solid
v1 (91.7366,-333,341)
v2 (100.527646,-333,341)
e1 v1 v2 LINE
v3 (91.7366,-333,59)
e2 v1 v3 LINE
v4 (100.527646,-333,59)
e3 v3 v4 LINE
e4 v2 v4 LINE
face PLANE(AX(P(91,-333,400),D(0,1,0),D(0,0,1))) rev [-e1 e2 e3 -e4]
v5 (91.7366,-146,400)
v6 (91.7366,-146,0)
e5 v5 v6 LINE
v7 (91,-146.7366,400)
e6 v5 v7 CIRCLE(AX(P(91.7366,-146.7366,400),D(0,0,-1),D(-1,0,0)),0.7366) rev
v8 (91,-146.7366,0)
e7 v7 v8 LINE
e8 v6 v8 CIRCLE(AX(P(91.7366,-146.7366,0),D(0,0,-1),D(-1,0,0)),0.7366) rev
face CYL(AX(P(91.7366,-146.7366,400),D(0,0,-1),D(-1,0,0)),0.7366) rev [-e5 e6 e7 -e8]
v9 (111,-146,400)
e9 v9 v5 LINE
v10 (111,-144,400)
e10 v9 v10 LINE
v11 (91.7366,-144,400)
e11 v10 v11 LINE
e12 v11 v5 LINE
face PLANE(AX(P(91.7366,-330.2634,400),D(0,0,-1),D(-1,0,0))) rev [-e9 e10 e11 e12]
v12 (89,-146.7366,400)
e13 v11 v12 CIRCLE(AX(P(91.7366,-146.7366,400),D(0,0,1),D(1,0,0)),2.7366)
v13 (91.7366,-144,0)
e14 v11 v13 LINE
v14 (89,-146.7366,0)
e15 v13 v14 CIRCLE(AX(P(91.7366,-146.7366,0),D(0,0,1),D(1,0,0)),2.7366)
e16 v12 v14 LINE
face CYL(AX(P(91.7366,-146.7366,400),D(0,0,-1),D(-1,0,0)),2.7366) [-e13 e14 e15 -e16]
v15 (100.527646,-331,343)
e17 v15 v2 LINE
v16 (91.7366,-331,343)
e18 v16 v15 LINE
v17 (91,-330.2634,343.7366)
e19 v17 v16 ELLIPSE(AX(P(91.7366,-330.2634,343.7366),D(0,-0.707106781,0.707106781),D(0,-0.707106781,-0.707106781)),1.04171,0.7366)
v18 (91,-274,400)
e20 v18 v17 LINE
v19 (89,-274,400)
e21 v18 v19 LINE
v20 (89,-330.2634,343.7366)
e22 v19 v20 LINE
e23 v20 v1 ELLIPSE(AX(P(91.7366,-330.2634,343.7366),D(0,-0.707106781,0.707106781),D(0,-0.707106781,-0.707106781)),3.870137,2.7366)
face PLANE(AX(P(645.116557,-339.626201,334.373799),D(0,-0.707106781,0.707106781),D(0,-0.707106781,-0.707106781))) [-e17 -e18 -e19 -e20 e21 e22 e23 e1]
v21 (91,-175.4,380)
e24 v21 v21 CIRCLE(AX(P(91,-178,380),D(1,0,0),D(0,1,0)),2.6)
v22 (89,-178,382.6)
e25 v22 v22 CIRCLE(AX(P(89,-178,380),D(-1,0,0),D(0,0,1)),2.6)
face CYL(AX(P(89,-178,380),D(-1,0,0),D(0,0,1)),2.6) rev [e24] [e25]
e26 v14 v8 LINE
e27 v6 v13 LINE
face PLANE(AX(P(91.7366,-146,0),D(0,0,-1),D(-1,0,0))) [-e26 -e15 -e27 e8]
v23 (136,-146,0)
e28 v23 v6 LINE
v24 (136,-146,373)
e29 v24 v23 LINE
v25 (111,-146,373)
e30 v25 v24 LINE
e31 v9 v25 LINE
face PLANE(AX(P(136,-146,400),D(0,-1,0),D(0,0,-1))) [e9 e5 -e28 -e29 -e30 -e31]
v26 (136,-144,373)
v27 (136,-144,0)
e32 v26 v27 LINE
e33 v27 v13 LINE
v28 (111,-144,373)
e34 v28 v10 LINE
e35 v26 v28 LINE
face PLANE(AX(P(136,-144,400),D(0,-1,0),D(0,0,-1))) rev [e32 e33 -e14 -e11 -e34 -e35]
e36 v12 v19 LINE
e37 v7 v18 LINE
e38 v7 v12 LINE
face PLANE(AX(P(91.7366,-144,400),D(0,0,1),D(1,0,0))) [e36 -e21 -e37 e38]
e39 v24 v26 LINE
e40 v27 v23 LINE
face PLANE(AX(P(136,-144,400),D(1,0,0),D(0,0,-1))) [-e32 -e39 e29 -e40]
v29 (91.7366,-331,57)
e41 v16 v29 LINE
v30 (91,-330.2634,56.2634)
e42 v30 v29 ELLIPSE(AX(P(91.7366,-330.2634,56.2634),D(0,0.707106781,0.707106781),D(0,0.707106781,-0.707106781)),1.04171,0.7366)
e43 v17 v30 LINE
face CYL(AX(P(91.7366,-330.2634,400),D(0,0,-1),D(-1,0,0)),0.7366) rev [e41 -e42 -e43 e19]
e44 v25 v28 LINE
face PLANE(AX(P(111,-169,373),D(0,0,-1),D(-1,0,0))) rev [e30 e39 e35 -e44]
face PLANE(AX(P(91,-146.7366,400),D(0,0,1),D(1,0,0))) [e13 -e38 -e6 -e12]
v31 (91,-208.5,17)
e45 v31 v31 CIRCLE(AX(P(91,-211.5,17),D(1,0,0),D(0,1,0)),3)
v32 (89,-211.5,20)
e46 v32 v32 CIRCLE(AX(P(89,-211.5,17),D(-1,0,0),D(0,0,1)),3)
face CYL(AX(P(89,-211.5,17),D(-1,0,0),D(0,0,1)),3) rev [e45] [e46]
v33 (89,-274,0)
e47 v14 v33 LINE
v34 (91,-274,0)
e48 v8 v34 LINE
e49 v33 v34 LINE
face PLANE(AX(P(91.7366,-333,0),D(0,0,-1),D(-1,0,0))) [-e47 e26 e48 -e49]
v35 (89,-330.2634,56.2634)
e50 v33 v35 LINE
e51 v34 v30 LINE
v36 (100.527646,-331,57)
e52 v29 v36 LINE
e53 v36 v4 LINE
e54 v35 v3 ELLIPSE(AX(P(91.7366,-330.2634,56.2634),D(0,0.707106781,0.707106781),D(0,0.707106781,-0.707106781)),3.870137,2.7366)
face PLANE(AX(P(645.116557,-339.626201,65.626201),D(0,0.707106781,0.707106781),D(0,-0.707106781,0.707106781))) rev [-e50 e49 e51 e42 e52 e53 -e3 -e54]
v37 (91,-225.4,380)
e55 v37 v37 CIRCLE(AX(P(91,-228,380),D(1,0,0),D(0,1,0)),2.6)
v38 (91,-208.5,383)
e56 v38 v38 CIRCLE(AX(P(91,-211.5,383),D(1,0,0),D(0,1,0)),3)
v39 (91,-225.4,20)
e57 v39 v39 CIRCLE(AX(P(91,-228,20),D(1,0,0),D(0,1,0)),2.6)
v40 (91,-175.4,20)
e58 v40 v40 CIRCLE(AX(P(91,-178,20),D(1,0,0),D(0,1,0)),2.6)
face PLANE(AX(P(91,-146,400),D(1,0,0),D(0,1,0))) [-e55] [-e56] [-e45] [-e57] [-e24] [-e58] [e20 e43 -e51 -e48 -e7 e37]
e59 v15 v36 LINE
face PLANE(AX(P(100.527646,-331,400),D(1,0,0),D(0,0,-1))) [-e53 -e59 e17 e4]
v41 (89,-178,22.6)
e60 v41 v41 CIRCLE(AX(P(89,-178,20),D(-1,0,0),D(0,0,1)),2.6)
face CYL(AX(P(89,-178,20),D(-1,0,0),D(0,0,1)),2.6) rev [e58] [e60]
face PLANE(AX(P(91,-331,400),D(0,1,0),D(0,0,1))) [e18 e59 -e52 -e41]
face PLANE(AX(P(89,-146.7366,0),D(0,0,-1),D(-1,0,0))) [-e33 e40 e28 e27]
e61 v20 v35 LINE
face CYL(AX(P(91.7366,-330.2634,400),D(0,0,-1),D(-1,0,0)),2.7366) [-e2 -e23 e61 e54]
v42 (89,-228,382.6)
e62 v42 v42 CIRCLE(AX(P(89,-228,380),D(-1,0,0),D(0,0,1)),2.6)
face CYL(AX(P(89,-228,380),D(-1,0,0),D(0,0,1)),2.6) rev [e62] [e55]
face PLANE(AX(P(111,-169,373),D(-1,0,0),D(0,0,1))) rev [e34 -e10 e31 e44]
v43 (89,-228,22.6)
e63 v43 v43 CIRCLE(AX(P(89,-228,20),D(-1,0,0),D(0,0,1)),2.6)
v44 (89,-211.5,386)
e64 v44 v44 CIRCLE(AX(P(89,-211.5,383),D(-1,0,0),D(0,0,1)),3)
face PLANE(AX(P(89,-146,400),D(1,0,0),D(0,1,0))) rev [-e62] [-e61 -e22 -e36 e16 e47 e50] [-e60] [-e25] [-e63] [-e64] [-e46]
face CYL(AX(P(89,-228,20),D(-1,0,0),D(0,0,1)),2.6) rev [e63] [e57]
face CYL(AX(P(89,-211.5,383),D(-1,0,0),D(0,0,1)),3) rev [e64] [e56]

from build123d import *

# Parameters (mm, degrees)
SM_BASE_FLANGE_1_DEPTH           = 400
HOLE_WIZARD_5_2_5_2_1_AT_2_COUNT = 2
HOLE_WIZARD_5_2_5_2_1_AT_2_PITCH = 50
CUT_EXTRUDE_1_DEPTH              = 523.587791668
HOLE_WIZARD_6_0_6_1_D            = 6
HOLE_WIZARD_6_0_6_1_DEPTH        = 220
HOLE_WIZARD_6_0_6_1_TIP          = 1.802581857
SKETCH_11_W                      = 32.021510722
SKETCH_11_H                      = 35
CUT_EXTRUDE_2_DEPTH              = 25


# Sheet-metal steps are written as plain solids
with BuildPart() as part:
    # Sketch 1 → 基体-法兰1 (new body)
    with BuildSketch(Plane.XY):
        with BuildLine():
            Line((136, -146), (91.7366, -146))
            ThreePointArc((91.7366, -146), (91.215745145, -146.215745145), (91, -146.7366))
            Line((91, -146.7366), (91, -330.2634))
            ThreePointArc((91, -330.2634), (91.215745145, -330.784254855), (91.7366, -331))
            Line((91.7366, -331), (100.527645566, -331))
            Line((100.527645566, -331), (100.527645566, -333))
            Line((100.527645566, -333), (91.7366, -333))
            ThreePointArc((91.7366, -333), (89.801531583, -332.198468417), (89, -330.2634))
            Line((89, -330.2634), (89, -146.7366))
            ThreePointArc((89, -146.7366), (89.801531583, -144.801531583), (91.7366, -144))
            Line((91.7366, -144), (136, -144))
            Line((136, -144), (136, -146))
        make_face()
    extrude(amount=SM_BASE_FLANGE_1_DEPTH)

    # 草图6 → Ø5.2 (5.2) 直径孔1 (revolve, cut)
    with BuildSketch(Plane(origin=(89, -178, 380), x_dir=(0, 0, 1), z_dir=(0, 1, 0))):
        Polygon((0, 0), (0, 11.562237609), (2.6, 10), (2.6, 0), align=None)
    hole_wizard_5_2_5_2_1 = revolve(axis=Axis((82.65, -178, 380), (1, 0, 0)), mode=Mode.SUBTRACT)

    # Ø5.2 (5.2) 直径孔1 at 2: Ø5.2 (5.2) 直径孔1 ×2
    with Locations(*[(0, -i * HOLE_WIZARD_5_2_5_2_1_AT_2_PITCH, 0) for i in range(1, HOLE_WIZARD_5_2_5_2_1_AT_2_COUNT)]):
        add(hole_wizard_5_2_5_2_1, mode=Mode.SUBTRACT)

    # 镜向1: Ø5.2 (5.2) 直径孔1 across plane
    add(hole_wizard_5_2_5_2_1.mirror(Plane(origin=(0, 0, 200), x_dir=(1, 0, 0), z_dir=(0, 0, -1))), mode=Mode.SUBTRACT)

    # 镜向1 copy 1 sketch → 镜向1 copy 1 (revolve, cut)
    with BuildSketch(Plane(origin=(89, -228, 20), x_dir=(0, 0, -1), z_dir=(0, 1, 0))):
        Polygon((0, 0), (0, -11.562237609), (2.6, -10), (2.6, 0), align=None)
    revolve(axis=Axis((82.65, -228, 20), (-1, 0, 0)), mode=Mode.SUBTRACT)

    # 草图8 → 切除-拉伸1 (cut, symmetric)
    with BuildSketch(Plane.ZY.offset(-89)):
        Polygon((-267.508163369, -941.508163369), (334.373798762, -339.626201238), (400, -274), (1001.88196213, 327.88196213), (2205.645886391, -875.88196213), (936.255760892, -2145.27208763), align=None)
    cut_extrude_1 = extrude(amount=CUT_EXTRUDE_1_DEPTH, both=True, mode=Mode.SUBTRACT)

    # 镜向2: 切除-拉伸1 across plane
    add(cut_extrude_1.mirror(Plane(origin=(0, 0, 200), x_dir=(1, 0, 0), z_dir=(0, 0, -1))), mode=Mode.SUBTRACT)

    # Ø6.0 (6) 直径孔1
    with Locations(Plane.ZY.offset(-89)):
        with Locations((17, -211.5), (383, -211.5)):
            Hole(HOLE_WIZARD_6_0_6_1_D / 2, depth=HOLE_WIZARD_6_0_6_1_DEPTH)
            with Locations((0, 0, -(HOLE_WIZARD_6_0_6_1_DEPTH + HOLE_WIZARD_6_0_6_1_TIP / 2))):  # 118° drill point
                Cone(0, HOLE_WIZARD_6_0_6_1_D / 2, HOLE_WIZARD_6_0_6_1_TIP, mode=Mode.SUBTRACT)

    # 草图11 → 切除-拉伸2 (cut)
    with BuildSketch(Plane(origin=(0, -144, 0), x_dir=(1, 0, 0), z_dir=(0, 1, 0))):
        with Locations((127.010755361, -390.5)):
            Rectangle(SKETCH_11_W, SKETCH_11_H)
    extrude(amount=-CUT_EXTRUDE_2_DEPTH, mode=Mode.SUBTRACT)


solid = part.part
